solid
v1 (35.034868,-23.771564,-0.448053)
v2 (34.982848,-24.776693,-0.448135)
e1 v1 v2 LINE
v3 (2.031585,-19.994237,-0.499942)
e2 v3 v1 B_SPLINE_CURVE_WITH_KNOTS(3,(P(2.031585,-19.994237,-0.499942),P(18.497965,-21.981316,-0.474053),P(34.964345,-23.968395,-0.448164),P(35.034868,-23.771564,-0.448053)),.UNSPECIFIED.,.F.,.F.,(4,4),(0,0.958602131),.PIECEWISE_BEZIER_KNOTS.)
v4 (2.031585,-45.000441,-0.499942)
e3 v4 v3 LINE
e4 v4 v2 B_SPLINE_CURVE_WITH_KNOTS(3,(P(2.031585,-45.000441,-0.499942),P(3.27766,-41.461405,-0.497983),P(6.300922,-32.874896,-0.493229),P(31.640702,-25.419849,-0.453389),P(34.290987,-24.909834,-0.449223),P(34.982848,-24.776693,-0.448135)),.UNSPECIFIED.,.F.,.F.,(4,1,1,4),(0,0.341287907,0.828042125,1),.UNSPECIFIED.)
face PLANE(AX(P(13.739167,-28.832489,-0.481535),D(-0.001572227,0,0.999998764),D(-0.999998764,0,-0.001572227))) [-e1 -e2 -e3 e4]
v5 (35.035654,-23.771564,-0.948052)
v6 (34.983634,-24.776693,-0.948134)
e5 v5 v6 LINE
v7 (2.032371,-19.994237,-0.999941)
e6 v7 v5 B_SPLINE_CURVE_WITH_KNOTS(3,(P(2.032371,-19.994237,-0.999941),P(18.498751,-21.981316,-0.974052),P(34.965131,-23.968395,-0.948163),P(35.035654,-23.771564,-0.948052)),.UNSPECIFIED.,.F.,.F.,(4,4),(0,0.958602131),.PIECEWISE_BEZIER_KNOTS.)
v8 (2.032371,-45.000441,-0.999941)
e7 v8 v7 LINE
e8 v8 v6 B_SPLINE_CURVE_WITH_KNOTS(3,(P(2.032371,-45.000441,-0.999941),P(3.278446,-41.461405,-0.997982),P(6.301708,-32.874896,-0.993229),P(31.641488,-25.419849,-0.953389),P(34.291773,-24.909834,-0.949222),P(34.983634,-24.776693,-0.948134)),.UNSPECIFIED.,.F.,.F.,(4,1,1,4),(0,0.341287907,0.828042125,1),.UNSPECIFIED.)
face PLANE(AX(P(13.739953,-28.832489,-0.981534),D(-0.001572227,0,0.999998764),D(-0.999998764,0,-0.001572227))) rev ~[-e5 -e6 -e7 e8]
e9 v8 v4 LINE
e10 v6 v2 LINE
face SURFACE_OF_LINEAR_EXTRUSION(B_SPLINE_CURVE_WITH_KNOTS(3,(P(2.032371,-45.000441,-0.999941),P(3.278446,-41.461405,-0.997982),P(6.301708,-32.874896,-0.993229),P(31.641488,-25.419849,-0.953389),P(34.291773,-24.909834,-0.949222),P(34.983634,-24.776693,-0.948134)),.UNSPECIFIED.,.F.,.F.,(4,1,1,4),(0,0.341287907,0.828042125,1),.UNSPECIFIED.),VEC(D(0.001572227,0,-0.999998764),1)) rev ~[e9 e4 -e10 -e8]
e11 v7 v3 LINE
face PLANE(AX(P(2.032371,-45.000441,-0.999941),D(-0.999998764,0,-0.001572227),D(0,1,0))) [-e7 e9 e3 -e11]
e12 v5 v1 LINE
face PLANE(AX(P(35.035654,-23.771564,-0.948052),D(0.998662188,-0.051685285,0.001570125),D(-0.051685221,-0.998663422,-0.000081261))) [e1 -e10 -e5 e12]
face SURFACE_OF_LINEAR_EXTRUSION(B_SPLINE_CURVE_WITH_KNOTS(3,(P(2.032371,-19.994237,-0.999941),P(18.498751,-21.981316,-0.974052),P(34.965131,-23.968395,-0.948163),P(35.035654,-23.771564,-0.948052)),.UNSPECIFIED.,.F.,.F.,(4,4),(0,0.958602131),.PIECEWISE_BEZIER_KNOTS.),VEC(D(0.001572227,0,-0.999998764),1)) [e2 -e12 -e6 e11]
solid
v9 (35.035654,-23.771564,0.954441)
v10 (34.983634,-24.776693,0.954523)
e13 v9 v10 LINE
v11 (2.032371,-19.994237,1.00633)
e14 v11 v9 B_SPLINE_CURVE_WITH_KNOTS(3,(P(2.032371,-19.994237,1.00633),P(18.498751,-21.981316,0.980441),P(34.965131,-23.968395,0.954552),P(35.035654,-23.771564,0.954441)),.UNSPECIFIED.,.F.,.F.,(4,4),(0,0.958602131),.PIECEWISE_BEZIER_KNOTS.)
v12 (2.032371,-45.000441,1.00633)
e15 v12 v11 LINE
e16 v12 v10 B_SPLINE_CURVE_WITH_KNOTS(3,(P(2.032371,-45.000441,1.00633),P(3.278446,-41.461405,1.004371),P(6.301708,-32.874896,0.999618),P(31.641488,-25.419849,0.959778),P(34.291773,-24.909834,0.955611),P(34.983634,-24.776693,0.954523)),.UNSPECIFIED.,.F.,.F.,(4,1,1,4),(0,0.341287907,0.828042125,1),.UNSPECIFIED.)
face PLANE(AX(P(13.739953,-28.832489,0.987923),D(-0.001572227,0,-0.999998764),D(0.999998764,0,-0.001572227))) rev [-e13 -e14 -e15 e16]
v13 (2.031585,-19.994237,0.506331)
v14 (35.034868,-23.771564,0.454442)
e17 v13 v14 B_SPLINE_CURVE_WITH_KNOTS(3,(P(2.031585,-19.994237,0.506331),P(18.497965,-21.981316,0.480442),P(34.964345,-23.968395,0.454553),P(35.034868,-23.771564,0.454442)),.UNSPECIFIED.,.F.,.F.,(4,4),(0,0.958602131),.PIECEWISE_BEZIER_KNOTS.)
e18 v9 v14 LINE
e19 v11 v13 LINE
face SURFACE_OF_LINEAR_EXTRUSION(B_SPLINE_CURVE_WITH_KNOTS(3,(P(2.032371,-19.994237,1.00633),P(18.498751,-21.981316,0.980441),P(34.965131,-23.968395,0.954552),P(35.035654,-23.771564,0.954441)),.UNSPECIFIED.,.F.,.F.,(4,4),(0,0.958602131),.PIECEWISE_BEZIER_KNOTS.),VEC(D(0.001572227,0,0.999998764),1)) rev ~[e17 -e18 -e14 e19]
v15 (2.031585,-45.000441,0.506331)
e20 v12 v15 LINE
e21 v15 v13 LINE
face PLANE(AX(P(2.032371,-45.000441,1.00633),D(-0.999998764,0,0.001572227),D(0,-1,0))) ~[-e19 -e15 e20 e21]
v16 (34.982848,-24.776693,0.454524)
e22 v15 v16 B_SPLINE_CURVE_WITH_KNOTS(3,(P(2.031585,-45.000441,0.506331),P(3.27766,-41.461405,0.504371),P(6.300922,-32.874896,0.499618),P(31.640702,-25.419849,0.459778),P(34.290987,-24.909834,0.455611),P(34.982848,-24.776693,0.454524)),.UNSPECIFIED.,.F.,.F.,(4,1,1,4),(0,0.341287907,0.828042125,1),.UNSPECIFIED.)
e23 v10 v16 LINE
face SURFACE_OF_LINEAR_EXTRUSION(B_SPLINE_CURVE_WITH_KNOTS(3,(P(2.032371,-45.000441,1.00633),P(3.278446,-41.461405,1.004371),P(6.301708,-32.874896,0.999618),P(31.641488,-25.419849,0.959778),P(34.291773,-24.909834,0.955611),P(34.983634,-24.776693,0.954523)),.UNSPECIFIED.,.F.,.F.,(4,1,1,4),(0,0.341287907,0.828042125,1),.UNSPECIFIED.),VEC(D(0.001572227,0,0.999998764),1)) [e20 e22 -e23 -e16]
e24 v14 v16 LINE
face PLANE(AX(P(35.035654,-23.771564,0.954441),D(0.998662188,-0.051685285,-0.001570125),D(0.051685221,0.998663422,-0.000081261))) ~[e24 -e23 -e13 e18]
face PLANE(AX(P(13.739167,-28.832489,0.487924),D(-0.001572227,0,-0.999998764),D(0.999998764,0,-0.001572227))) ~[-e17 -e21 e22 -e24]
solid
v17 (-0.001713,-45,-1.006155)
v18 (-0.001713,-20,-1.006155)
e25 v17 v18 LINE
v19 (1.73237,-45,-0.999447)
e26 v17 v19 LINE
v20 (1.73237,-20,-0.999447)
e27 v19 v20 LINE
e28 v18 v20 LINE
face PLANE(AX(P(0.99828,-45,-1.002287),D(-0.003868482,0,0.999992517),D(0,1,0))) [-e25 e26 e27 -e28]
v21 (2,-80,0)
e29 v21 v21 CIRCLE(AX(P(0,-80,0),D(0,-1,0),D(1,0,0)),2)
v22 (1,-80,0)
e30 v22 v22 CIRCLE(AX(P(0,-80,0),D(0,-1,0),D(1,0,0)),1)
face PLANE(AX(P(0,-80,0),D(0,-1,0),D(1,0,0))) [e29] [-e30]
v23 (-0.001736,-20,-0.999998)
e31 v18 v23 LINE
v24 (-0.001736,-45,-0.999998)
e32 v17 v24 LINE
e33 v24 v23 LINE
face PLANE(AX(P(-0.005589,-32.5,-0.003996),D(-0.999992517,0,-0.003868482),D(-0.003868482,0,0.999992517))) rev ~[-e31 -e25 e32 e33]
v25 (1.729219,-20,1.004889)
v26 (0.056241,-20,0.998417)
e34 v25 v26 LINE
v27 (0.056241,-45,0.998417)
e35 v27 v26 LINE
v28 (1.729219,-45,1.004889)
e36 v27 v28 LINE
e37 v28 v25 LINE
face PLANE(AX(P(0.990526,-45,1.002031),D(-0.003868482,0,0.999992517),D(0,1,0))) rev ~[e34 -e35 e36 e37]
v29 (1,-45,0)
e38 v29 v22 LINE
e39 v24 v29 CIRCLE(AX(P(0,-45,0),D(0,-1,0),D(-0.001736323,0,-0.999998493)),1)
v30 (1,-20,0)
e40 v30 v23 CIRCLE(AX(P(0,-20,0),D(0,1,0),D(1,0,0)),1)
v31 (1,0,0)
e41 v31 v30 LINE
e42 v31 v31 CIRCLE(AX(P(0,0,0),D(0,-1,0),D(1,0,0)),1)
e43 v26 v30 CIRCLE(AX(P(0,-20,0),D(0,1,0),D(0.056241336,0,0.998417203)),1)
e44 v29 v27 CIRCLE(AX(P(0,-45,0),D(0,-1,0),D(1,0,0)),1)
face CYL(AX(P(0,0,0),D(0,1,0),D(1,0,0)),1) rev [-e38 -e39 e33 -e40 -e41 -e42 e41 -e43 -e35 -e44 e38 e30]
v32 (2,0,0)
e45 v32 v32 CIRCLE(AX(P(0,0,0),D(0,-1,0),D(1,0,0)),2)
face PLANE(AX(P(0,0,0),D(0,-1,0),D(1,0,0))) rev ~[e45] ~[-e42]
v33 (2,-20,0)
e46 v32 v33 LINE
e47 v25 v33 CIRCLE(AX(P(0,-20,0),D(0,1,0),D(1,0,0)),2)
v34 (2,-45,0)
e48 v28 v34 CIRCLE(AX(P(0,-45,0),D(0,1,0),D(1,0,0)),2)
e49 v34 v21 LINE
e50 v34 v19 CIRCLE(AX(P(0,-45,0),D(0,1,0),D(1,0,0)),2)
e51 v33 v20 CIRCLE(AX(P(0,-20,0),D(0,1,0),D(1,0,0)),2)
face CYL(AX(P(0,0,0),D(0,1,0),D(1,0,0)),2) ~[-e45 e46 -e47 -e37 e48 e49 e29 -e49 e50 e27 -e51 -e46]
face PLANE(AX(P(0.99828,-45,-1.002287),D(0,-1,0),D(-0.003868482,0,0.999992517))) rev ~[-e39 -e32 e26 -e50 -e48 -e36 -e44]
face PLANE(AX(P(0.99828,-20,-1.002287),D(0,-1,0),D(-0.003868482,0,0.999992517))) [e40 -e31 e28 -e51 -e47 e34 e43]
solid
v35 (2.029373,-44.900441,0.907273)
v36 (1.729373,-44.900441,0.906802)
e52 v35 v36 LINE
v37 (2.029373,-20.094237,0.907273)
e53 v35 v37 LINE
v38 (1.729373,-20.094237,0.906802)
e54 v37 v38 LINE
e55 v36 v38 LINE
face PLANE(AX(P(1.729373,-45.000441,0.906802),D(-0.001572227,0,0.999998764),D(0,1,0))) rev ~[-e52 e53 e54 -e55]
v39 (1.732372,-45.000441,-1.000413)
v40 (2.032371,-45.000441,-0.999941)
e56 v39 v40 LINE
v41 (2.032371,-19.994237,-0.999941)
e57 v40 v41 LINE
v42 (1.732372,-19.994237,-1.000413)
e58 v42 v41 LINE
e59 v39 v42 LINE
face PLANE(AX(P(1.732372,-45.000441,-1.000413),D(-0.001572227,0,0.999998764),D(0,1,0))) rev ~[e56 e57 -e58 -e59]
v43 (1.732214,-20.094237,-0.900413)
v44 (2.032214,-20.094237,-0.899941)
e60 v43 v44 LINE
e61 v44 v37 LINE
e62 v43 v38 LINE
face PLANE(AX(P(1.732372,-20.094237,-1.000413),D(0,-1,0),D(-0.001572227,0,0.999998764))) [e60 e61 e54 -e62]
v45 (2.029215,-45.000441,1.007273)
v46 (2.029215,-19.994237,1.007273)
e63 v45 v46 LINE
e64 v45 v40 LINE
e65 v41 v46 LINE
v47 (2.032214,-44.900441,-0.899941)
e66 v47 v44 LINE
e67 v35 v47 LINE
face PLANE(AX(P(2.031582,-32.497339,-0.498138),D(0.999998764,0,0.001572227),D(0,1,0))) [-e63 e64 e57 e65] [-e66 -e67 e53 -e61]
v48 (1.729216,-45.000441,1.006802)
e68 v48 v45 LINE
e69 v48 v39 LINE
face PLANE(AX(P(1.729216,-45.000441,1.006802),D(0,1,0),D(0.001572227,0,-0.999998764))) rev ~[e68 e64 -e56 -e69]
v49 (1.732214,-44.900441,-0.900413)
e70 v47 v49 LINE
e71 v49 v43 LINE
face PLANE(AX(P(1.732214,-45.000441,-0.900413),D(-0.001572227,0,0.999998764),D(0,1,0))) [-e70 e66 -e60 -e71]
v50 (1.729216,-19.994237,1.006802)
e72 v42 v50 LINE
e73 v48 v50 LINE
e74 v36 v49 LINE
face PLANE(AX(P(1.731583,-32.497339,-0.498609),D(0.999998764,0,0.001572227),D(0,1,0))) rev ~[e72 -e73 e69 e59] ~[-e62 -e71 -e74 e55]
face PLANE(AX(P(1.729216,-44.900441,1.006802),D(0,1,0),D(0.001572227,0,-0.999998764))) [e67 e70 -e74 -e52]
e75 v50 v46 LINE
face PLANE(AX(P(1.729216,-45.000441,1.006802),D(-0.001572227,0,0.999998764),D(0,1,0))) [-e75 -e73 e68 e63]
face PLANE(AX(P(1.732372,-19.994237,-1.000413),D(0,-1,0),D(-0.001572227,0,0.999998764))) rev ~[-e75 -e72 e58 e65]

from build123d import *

# Parameters (mm, degrees)
F0_R          = 2
F0_R_2        = 1
F1_DEPTH      = 80
F5_E5_W       = 2.0043330533
F5_E5_H       = 25
F6_DEPTH      = 25
F6_DEPTH_BACK = 1
F8_W          = 25.0062048435
F8_H          = 1.0036084568
F9_DEPTH      = 0.3
F10_T         = -0.1
F12_DEPTH     = 0.5


with BuildPart() as f1:
    # F0 (on Front) → F1 (new body)
    with BuildSketch(Plane.XZ):
        Circle(F0_R)
        Circle(F0_R_2, mode=Mode.SUBTRACT)
    extrude(amount=F1_DEPTH)

    # F5_E5 (on explicit) → F6 (cut, two sides)
    with BuildSketch(Plane(origin=(0.9982800111, -45, -1.0022865608), x_dir=(-0.0038684819, 0, 0.9999925174), z_dir=(-0.9999925174, 0, -0.0038684819))) as f6_sk:
        with Locations((1.0021665267, 12.5)):
            Rectangle(F5_E5_W, F5_E5_H)
    extrude(amount=-F6_DEPTH, mode=Mode.SUBTRACT)
    extrude(f6_sk.sketch, amount=F6_DEPTH_BACK, mode=Mode.SUBTRACT)


with BuildPart() as f9:
    # F8 (on face) → F9 (new body)
    with BuildSketch(Plane(origin=(1.7307944858, 0, 0.0027212049), x_dir=(0, 1, 0), z_dir=(0.9999987641, 0, 0.0015722268))):
        with Locations((-32.4973389506, -0.5013310001)):
            Rectangle(F8_W, F8_H)
        with Locations((-32.4973389506, 0.5022774567)):
            Rectangle(F8_W, F8_H)
    extrude(amount=F9_DEPTH)

    # F10
    f10_openings = [f9.faces().sort_by_distance(p)[0] for p in [
        (2.030793, -32.497339, 0.003666),
        (1.730794, -32.497339, 0.003194),
    ]]
    offset(amount=F10_T, openings=f10_openings)


with BuildPart() as f12:
    # F11 (on face) → F12 (new body)
    with BuildSketch(Plane(origin=(0.0015771561, 0, -1.0031339887), x_dir=(0.9999987641, 0, 0.0015722268), z_dir=(0.0015722268, 0, -0.9999987641))):
        with BuildLine():
            add(Edge.make_bspline(
                [(2.030796625, 45.0004413724), (3.2768731661, 41.4614047034), (6.3001384058, 32.8748964189), (31.6399499831, 25.4198492331), (34.290238067, 24.9098338007), (34.9821001291, 24.7766934335)],
                knots=[0, 0, 0, 0, 0.3412879074, 0.8280421251, 1, 1, 1, 1], degree=3))
            Line((2.030796625, 45.0004413724), (2.030796625, 19.9942365289))
            add(Edge.make_bspline(
                [(2.030796625, 19.9942365289), (18.4971969643, 21.9813155341), (34.9635973036, 23.9683945393), (35.0341200829, 23.7715635449)],
                knots=[0, 0, 0, 0, 0.9586021312, 0.9586021312, 0.9586021312, 0.9586021312], degree=3))
            Line((35.0341200829, 23.7715635449), (34.9821001291, 24.7766934335))
        make_face()
    extrude(amount=-F12_DEPTH)


with BuildPart() as f14_1:
    # F14: instance of F12
    add(f12.part.mirror(Plane.XY.offset(0.0031944326)))


solid = Compound([f1.part, f9.part, f12.part, f14_1.part])
